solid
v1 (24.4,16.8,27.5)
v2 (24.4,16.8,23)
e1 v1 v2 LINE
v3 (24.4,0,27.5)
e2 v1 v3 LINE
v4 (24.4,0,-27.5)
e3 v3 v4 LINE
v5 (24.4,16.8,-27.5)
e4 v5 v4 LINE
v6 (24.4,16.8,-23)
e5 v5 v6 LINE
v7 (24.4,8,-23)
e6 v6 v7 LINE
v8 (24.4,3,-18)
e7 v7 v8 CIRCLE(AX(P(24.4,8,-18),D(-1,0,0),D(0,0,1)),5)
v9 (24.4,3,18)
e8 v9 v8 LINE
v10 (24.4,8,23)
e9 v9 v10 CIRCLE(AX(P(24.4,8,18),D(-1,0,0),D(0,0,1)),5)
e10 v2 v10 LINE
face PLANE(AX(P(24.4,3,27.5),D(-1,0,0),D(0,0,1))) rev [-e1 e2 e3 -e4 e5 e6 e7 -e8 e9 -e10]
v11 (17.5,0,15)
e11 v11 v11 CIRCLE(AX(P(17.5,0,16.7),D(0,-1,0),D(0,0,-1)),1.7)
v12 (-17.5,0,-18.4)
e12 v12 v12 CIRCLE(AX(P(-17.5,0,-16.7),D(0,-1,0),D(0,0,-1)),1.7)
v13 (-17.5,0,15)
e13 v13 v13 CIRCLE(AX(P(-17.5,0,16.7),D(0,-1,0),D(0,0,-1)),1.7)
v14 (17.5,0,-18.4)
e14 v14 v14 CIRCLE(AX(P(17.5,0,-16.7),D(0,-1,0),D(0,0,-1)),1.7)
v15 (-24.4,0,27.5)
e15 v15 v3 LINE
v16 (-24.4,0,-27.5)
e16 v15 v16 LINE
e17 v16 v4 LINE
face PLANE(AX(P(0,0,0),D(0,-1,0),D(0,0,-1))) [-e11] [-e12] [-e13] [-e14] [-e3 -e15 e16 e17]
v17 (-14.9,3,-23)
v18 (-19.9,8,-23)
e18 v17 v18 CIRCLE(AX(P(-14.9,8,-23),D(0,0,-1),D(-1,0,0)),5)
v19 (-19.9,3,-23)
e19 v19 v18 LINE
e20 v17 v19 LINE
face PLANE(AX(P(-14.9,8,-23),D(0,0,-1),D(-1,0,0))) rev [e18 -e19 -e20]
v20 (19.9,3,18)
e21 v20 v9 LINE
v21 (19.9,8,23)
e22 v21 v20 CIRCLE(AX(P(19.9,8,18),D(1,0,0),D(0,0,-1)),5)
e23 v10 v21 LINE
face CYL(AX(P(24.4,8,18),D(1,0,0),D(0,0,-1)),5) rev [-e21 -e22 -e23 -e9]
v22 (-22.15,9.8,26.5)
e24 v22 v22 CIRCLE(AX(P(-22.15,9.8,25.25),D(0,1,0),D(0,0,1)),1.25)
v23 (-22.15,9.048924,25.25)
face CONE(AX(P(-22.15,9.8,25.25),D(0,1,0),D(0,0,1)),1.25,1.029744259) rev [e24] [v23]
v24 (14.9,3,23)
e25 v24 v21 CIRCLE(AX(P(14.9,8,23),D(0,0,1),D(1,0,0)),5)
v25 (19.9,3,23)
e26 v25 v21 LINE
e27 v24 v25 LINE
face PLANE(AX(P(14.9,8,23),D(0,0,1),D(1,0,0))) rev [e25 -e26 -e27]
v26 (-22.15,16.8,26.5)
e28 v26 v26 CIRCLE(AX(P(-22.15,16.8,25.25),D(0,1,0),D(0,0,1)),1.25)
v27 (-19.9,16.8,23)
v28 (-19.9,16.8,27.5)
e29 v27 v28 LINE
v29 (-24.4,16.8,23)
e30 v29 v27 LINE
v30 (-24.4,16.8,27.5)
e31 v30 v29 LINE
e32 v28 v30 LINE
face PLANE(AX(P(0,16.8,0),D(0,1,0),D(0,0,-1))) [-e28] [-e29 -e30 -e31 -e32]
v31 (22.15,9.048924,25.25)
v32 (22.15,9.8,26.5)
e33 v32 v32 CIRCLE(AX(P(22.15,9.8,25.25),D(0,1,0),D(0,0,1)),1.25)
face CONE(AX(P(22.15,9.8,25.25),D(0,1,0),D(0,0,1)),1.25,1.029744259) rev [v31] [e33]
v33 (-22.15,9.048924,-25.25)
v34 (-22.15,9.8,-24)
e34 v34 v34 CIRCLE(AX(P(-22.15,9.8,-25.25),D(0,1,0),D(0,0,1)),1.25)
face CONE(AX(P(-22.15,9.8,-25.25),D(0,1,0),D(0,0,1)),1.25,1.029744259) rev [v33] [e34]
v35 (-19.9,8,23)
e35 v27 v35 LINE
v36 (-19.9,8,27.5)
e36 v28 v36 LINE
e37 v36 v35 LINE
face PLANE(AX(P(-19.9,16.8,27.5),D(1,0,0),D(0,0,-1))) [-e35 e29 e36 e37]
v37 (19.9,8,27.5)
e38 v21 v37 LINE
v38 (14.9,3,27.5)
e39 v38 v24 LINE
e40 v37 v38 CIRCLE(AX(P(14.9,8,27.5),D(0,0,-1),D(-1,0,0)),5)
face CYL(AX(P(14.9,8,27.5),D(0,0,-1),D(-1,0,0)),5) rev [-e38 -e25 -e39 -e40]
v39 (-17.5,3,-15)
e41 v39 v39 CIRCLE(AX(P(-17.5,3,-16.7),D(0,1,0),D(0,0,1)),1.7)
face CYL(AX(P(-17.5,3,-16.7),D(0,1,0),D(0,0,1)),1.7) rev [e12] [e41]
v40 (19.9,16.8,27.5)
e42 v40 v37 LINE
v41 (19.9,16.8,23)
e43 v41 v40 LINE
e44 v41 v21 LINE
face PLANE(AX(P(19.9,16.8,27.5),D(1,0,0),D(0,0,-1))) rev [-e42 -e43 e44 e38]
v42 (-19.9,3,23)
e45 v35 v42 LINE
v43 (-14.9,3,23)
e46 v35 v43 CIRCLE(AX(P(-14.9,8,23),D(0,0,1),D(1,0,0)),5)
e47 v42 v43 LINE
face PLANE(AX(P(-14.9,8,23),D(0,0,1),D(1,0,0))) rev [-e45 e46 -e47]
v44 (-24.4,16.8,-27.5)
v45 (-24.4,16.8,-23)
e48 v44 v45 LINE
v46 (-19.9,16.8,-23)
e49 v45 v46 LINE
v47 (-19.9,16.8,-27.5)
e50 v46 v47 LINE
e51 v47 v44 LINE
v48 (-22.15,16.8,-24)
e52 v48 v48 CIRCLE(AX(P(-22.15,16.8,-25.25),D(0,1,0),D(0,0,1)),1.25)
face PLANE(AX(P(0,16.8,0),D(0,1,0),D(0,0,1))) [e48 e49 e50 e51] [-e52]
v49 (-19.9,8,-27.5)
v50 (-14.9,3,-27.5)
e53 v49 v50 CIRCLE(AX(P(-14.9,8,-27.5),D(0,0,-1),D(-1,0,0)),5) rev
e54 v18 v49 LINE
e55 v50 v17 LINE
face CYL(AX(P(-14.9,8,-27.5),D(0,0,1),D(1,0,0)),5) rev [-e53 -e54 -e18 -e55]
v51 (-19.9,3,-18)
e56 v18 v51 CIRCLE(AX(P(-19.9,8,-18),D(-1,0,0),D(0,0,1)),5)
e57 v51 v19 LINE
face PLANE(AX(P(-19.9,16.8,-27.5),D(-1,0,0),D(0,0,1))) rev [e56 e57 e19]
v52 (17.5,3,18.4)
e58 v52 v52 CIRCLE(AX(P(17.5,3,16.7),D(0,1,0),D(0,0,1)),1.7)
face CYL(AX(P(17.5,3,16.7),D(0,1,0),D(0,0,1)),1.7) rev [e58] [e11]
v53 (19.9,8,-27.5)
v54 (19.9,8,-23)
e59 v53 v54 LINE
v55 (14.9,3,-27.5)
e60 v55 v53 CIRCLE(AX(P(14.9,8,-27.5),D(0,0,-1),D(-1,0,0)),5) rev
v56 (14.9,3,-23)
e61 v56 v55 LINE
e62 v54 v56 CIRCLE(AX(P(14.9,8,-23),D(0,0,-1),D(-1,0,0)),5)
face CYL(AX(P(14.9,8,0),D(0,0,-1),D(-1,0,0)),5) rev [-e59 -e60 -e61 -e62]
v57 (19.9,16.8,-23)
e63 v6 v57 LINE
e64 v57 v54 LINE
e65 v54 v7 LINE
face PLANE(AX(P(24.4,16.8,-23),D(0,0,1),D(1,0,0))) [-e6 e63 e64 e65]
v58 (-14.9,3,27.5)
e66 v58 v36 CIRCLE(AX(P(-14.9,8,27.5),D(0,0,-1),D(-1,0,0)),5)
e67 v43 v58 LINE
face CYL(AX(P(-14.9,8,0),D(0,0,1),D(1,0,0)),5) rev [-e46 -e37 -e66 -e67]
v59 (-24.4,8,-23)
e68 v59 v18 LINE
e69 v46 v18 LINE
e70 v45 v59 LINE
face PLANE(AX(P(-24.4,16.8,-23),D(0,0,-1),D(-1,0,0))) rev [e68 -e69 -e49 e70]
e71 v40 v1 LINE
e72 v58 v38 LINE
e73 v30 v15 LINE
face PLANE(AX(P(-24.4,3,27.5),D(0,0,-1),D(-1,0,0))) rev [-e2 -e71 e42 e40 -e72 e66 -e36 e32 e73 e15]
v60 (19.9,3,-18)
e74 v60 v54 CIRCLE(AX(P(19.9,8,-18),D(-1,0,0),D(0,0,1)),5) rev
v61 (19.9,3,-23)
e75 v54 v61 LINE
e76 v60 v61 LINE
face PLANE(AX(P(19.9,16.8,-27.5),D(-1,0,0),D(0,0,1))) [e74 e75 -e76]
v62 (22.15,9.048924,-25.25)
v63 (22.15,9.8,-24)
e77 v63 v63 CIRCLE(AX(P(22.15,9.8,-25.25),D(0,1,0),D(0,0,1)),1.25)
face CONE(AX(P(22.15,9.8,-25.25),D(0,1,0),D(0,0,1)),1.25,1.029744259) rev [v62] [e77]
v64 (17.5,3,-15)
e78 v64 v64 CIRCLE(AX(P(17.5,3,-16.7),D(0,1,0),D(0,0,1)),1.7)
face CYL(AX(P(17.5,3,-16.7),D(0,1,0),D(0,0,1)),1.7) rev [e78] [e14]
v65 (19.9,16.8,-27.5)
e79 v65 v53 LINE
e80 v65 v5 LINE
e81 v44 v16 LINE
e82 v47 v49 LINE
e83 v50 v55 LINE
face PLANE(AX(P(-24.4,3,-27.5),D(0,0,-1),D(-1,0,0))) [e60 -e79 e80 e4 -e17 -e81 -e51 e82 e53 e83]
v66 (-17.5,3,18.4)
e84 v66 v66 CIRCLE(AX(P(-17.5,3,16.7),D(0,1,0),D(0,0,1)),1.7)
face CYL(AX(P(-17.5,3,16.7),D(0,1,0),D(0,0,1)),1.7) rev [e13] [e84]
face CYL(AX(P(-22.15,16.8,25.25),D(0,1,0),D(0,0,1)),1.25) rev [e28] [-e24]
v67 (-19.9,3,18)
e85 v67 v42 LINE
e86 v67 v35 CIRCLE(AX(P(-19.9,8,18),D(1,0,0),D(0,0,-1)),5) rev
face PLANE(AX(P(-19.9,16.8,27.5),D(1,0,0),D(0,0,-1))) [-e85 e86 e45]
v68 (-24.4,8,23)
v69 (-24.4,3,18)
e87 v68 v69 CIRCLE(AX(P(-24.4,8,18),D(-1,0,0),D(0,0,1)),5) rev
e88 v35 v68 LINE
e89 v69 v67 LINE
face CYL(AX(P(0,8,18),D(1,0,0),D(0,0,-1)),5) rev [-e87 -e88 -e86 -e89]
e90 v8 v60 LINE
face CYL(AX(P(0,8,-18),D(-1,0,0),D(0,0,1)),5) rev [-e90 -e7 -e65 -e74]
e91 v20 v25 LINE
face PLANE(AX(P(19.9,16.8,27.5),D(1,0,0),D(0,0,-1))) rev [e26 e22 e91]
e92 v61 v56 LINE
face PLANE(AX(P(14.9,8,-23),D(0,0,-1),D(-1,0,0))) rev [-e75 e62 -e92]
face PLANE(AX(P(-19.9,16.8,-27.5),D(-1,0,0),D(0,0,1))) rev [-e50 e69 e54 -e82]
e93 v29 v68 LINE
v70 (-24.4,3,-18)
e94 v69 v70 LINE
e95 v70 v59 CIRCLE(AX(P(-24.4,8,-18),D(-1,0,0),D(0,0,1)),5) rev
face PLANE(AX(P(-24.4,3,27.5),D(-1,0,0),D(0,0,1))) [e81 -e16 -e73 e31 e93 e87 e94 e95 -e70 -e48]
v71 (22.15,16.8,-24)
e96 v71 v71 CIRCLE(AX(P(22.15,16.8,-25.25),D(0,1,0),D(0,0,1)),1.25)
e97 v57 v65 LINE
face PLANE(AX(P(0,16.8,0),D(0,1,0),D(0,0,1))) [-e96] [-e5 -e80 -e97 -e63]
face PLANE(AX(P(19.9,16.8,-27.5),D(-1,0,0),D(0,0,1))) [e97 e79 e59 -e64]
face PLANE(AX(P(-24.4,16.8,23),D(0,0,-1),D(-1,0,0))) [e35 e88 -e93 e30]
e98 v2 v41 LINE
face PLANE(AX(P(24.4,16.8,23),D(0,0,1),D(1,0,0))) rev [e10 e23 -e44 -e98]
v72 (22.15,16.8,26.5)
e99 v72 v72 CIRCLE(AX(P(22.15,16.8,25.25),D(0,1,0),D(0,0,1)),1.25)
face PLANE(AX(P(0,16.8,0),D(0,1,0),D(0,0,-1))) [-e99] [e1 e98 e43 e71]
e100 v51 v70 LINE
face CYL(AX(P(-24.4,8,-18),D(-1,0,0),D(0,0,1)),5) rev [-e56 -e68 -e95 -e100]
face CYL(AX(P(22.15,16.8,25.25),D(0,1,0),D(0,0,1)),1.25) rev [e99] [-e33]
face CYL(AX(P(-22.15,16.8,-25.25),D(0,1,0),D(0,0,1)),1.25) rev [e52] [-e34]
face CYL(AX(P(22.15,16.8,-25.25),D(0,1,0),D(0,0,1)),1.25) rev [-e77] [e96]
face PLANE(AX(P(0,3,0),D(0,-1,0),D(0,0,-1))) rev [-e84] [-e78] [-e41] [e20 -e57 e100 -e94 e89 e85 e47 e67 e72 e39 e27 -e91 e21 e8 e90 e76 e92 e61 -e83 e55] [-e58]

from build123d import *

# Parameters (mm, degrees)
SKETCH1_W               = 48.8
SKETCH1_H               = 55
BOSS_EXTRUDE1_DEPTH     = 3
SKETCH2_W               = 4.5
SKETCH2_H               = 4.5
BOSS_EXTRUDE2_DEPTH     = 13.8
FILLET1_R               = 5
FILLET2_START           = -27.5
FILLET2_DEPTH           = 4.5
MIRROR4_COPY_1_SKETCH_W = 4.5
MIRROR4_COPY_1_SKETCH_H = 4.5
MIRROR4_COPY_1_DEPTH    = 13.8
FILLET3_R               = 5
FILLET4_START           = -27.5
FILLET4_DEPTH           = 4.5
FILLET5_R               = 5
FILLET6_START           = 23
FILLET6_DEPTH           = 4.5
FILLET7_R               = 5
FILLET8_START           = 23
FILLET8_DEPTH           = 4.5


with BuildPart() as part:
    # Sketch1 → Boss-Extrude1 (new body)
    with BuildSketch(Plane(origin=(0, 0, 0), x_dir=(1, 0, 0), z_dir=(0, 1, 0))):
        Rectangle(SKETCH1_W, SKETCH1_H)
    extrude(amount=BOSS_EXTRUDE1_DEPTH)

    # Sketch2 → Boss-Extrude2 (add)
    with BuildSketch(Plane(origin=(0, 3, 0), x_dir=(1, 0, 0), z_dir=(0, 1, 0))):
        with Locations((-22.15, 25.25)):
            Rectangle(SKETCH2_W, SKETCH2_H)
    boss_extrude2 = extrude(amount=BOSS_EXTRUDE2_DEPTH)

    # Sketch11 → M3x0.5 Tapped Hole1 (revolve, cut)
    with BuildSketch(Plane(origin=(-22.15, 16.8, -25.25), x_dir=(0, 0, 1), z_dir=(1, 0, 0))):
        Polygon((0, 0), (0, 7.751075774), (1.25, 7), (1.25, 0), align=None)
    m3x0_5_tapped_hole1 = revolve(axis=Axis((-22.15, 23.15, -25.25), (0, -1, 0)), mode=Mode.SUBTRACT)

    # Sketch13 → M3 Clearance Hole1 (revolve, cut)
    with BuildSketch(Plane(origin=(-17.5, 3, -16.7), x_dir=(0, 0, 1), z_dir=(1, 0, 0))):
        Polygon((0, 0), (0, 9.521463052), (1.7, 8.5), (1.7, 0), align=None)
    m3_clearance_hole1 = revolve(axis=Axis((-17.5, 9.35, -16.7), (0, -1, 0)), mode=Mode.SUBTRACT)

    # Fillet1
    fillet1_edges = [part.edges().sort_by_distance(p)[0] for p in [
        (-22.15, 3, -23),
    ]]
    fillet(fillet1_edges, radius=FILLET1_R)

    # Fillet2: read off the stored shape, not the designer's step
    # Fillet2 outline → Fillet2 (add)
    with BuildSketch(Plane.XY.offset(FILLET2_START)):
        with BuildLine():
            ThreePointArc((-14.9, 3), (-18.435533906, 4.464466094), (-19.9, 8))
            Line((-19.9, 8), (-19.9, 3))
            Line((-19.9, 3), (-14.9, 3))
        make_face()
    extrude(amount=FILLET2_DEPTH)

    # Mirror3: Boss-Extrude2, M3x0.5 Tapped Hole1, M3 Clearance Hole1 across plane
    add(boss_extrude2.mirror(Plane(origin=(0, 0, 0), x_dir=(0, 0, 1), z_dir=(1, 0, 0))))
    add(m3x0_5_tapped_hole1.mirror(Plane(origin=(0, 0, 0), x_dir=(0, 0, 1), z_dir=(1, 0, 0))), mode=Mode.SUBTRACT)
    add(m3_clearance_hole1.mirror(Plane(origin=(0, 0, 0), x_dir=(0, 0, 1), z_dir=(1, 0, 0))), mode=Mode.SUBTRACT)

    # Mirror4: Boss-Extrude2, M3x0.5 Tapped Hole1, M3 Clearance Hole1 across plane
    add(boss_extrude2.mirror(Plane.XY))
    add(m3x0_5_tapped_hole1.mirror(Plane.XY), mode=Mode.SUBTRACT)
    add(m3_clearance_hole1.mirror(Plane.XY), mode=Mode.SUBTRACT)

    # Mirror4 copy 1 sketch → Mirror4 copy 1 (add)
    with BuildSketch(Plane(origin=(0, 3, 0), x_dir=(-1, 0, 0), z_dir=(0, 1, 0))):
        with Locations((-22.15, 25.25)):
            Rectangle(MIRROR4_COPY_1_SKETCH_W, MIRROR4_COPY_1_SKETCH_H)
    extrude(amount=MIRROR4_COPY_1_DEPTH)

    # Mirror4 copy 2 sketch → Mirror4 copy 2 (revolve, cut)
    with BuildSketch(Plane(origin=(22.15, 16.8, 25.25), x_dir=(0, 0, -1), z_dir=(-1, 0, 0))):
        Polygon((0, 0), (0, 7.751075774), (1.25, 7), (1.25, 0), align=None)
    revolve(axis=Axis((22.15, 23.15, 25.25), (0, -1, 0)), mode=Mode.SUBTRACT)

    # Mirror4 copy 3 sketch → Mirror4 copy 3 (revolve, cut)
    with BuildSketch(Plane(origin=(17.5, 3, 16.7), x_dir=(0, 0, -1), z_dir=(-1, 0, 0))):
        Polygon((0, 0), (0, 9.521463052), (1.7, 8.5), (1.7, 0), align=None)
    revolve(axis=Axis((17.5, 9.35, 16.7), (0, -1, 0)), mode=Mode.SUBTRACT)

    # Fillet3
    fillet3_edges = [part.edges().sort_by_distance(p)[0] for p in [
        (22.15, 3, -23),
    ]]
    fillet(fillet3_edges, radius=FILLET3_R)

    # Fillet4: read off the stored shape, not the designer's step
    # Fillet4 outline → Fillet4 (add)
    with BuildSketch(Plane.XY.offset(FILLET4_START)):
        with BuildLine():
            Line((19.9, 3), (19.9, 8))
            ThreePointArc((19.9, 8), (18.435533906, 4.464466094), (14.9, 3))
            Line((14.9, 3), (19.9, 3))
        make_face()
    extrude(amount=FILLET4_DEPTH)

    # Fillet5
    fillet5_edges = [part.edges().sort_by_distance(p)[0] for p in [
        (22.15, 3, 23),
    ]]
    fillet(fillet5_edges, radius=FILLET5_R)

    # Fillet6: read off the stored shape, not the designer's step
    # Fillet6 outline → Fillet6 (add)
    with BuildSketch(Plane.XY.offset(FILLET6_START)):
        with BuildLine():
            Line((19.9, 3), (19.9, 8))
            ThreePointArc((19.9, 8), (18.435533906, 4.464466094), (14.9, 3))
            Line((14.9, 3), (19.9, 3))
        make_face()
    extrude(amount=FILLET6_DEPTH)

    # Fillet7
    fillet7_edges = [part.edges().sort_by_distance(p)[0] for p in [
        (-22.15, 3, 23),
    ]]
    fillet(fillet7_edges, radius=FILLET7_R)

    # Fillet8: read off the stored shape, not the designer's step
    # Fillet8 outline → Fillet8 (add)
    with BuildSketch(Plane.XY.offset(FILLET8_START)):
        with BuildLine():
            ThreePointArc((-14.9, 3), (-18.435533906, 4.464466094), (-19.9, 8))
            Line((-19.9, 8), (-19.9, 3))
            Line((-19.9, 3), (-14.9, 3))
        make_face()
    extrude(amount=FILLET8_DEPTH)


solid = part.part
